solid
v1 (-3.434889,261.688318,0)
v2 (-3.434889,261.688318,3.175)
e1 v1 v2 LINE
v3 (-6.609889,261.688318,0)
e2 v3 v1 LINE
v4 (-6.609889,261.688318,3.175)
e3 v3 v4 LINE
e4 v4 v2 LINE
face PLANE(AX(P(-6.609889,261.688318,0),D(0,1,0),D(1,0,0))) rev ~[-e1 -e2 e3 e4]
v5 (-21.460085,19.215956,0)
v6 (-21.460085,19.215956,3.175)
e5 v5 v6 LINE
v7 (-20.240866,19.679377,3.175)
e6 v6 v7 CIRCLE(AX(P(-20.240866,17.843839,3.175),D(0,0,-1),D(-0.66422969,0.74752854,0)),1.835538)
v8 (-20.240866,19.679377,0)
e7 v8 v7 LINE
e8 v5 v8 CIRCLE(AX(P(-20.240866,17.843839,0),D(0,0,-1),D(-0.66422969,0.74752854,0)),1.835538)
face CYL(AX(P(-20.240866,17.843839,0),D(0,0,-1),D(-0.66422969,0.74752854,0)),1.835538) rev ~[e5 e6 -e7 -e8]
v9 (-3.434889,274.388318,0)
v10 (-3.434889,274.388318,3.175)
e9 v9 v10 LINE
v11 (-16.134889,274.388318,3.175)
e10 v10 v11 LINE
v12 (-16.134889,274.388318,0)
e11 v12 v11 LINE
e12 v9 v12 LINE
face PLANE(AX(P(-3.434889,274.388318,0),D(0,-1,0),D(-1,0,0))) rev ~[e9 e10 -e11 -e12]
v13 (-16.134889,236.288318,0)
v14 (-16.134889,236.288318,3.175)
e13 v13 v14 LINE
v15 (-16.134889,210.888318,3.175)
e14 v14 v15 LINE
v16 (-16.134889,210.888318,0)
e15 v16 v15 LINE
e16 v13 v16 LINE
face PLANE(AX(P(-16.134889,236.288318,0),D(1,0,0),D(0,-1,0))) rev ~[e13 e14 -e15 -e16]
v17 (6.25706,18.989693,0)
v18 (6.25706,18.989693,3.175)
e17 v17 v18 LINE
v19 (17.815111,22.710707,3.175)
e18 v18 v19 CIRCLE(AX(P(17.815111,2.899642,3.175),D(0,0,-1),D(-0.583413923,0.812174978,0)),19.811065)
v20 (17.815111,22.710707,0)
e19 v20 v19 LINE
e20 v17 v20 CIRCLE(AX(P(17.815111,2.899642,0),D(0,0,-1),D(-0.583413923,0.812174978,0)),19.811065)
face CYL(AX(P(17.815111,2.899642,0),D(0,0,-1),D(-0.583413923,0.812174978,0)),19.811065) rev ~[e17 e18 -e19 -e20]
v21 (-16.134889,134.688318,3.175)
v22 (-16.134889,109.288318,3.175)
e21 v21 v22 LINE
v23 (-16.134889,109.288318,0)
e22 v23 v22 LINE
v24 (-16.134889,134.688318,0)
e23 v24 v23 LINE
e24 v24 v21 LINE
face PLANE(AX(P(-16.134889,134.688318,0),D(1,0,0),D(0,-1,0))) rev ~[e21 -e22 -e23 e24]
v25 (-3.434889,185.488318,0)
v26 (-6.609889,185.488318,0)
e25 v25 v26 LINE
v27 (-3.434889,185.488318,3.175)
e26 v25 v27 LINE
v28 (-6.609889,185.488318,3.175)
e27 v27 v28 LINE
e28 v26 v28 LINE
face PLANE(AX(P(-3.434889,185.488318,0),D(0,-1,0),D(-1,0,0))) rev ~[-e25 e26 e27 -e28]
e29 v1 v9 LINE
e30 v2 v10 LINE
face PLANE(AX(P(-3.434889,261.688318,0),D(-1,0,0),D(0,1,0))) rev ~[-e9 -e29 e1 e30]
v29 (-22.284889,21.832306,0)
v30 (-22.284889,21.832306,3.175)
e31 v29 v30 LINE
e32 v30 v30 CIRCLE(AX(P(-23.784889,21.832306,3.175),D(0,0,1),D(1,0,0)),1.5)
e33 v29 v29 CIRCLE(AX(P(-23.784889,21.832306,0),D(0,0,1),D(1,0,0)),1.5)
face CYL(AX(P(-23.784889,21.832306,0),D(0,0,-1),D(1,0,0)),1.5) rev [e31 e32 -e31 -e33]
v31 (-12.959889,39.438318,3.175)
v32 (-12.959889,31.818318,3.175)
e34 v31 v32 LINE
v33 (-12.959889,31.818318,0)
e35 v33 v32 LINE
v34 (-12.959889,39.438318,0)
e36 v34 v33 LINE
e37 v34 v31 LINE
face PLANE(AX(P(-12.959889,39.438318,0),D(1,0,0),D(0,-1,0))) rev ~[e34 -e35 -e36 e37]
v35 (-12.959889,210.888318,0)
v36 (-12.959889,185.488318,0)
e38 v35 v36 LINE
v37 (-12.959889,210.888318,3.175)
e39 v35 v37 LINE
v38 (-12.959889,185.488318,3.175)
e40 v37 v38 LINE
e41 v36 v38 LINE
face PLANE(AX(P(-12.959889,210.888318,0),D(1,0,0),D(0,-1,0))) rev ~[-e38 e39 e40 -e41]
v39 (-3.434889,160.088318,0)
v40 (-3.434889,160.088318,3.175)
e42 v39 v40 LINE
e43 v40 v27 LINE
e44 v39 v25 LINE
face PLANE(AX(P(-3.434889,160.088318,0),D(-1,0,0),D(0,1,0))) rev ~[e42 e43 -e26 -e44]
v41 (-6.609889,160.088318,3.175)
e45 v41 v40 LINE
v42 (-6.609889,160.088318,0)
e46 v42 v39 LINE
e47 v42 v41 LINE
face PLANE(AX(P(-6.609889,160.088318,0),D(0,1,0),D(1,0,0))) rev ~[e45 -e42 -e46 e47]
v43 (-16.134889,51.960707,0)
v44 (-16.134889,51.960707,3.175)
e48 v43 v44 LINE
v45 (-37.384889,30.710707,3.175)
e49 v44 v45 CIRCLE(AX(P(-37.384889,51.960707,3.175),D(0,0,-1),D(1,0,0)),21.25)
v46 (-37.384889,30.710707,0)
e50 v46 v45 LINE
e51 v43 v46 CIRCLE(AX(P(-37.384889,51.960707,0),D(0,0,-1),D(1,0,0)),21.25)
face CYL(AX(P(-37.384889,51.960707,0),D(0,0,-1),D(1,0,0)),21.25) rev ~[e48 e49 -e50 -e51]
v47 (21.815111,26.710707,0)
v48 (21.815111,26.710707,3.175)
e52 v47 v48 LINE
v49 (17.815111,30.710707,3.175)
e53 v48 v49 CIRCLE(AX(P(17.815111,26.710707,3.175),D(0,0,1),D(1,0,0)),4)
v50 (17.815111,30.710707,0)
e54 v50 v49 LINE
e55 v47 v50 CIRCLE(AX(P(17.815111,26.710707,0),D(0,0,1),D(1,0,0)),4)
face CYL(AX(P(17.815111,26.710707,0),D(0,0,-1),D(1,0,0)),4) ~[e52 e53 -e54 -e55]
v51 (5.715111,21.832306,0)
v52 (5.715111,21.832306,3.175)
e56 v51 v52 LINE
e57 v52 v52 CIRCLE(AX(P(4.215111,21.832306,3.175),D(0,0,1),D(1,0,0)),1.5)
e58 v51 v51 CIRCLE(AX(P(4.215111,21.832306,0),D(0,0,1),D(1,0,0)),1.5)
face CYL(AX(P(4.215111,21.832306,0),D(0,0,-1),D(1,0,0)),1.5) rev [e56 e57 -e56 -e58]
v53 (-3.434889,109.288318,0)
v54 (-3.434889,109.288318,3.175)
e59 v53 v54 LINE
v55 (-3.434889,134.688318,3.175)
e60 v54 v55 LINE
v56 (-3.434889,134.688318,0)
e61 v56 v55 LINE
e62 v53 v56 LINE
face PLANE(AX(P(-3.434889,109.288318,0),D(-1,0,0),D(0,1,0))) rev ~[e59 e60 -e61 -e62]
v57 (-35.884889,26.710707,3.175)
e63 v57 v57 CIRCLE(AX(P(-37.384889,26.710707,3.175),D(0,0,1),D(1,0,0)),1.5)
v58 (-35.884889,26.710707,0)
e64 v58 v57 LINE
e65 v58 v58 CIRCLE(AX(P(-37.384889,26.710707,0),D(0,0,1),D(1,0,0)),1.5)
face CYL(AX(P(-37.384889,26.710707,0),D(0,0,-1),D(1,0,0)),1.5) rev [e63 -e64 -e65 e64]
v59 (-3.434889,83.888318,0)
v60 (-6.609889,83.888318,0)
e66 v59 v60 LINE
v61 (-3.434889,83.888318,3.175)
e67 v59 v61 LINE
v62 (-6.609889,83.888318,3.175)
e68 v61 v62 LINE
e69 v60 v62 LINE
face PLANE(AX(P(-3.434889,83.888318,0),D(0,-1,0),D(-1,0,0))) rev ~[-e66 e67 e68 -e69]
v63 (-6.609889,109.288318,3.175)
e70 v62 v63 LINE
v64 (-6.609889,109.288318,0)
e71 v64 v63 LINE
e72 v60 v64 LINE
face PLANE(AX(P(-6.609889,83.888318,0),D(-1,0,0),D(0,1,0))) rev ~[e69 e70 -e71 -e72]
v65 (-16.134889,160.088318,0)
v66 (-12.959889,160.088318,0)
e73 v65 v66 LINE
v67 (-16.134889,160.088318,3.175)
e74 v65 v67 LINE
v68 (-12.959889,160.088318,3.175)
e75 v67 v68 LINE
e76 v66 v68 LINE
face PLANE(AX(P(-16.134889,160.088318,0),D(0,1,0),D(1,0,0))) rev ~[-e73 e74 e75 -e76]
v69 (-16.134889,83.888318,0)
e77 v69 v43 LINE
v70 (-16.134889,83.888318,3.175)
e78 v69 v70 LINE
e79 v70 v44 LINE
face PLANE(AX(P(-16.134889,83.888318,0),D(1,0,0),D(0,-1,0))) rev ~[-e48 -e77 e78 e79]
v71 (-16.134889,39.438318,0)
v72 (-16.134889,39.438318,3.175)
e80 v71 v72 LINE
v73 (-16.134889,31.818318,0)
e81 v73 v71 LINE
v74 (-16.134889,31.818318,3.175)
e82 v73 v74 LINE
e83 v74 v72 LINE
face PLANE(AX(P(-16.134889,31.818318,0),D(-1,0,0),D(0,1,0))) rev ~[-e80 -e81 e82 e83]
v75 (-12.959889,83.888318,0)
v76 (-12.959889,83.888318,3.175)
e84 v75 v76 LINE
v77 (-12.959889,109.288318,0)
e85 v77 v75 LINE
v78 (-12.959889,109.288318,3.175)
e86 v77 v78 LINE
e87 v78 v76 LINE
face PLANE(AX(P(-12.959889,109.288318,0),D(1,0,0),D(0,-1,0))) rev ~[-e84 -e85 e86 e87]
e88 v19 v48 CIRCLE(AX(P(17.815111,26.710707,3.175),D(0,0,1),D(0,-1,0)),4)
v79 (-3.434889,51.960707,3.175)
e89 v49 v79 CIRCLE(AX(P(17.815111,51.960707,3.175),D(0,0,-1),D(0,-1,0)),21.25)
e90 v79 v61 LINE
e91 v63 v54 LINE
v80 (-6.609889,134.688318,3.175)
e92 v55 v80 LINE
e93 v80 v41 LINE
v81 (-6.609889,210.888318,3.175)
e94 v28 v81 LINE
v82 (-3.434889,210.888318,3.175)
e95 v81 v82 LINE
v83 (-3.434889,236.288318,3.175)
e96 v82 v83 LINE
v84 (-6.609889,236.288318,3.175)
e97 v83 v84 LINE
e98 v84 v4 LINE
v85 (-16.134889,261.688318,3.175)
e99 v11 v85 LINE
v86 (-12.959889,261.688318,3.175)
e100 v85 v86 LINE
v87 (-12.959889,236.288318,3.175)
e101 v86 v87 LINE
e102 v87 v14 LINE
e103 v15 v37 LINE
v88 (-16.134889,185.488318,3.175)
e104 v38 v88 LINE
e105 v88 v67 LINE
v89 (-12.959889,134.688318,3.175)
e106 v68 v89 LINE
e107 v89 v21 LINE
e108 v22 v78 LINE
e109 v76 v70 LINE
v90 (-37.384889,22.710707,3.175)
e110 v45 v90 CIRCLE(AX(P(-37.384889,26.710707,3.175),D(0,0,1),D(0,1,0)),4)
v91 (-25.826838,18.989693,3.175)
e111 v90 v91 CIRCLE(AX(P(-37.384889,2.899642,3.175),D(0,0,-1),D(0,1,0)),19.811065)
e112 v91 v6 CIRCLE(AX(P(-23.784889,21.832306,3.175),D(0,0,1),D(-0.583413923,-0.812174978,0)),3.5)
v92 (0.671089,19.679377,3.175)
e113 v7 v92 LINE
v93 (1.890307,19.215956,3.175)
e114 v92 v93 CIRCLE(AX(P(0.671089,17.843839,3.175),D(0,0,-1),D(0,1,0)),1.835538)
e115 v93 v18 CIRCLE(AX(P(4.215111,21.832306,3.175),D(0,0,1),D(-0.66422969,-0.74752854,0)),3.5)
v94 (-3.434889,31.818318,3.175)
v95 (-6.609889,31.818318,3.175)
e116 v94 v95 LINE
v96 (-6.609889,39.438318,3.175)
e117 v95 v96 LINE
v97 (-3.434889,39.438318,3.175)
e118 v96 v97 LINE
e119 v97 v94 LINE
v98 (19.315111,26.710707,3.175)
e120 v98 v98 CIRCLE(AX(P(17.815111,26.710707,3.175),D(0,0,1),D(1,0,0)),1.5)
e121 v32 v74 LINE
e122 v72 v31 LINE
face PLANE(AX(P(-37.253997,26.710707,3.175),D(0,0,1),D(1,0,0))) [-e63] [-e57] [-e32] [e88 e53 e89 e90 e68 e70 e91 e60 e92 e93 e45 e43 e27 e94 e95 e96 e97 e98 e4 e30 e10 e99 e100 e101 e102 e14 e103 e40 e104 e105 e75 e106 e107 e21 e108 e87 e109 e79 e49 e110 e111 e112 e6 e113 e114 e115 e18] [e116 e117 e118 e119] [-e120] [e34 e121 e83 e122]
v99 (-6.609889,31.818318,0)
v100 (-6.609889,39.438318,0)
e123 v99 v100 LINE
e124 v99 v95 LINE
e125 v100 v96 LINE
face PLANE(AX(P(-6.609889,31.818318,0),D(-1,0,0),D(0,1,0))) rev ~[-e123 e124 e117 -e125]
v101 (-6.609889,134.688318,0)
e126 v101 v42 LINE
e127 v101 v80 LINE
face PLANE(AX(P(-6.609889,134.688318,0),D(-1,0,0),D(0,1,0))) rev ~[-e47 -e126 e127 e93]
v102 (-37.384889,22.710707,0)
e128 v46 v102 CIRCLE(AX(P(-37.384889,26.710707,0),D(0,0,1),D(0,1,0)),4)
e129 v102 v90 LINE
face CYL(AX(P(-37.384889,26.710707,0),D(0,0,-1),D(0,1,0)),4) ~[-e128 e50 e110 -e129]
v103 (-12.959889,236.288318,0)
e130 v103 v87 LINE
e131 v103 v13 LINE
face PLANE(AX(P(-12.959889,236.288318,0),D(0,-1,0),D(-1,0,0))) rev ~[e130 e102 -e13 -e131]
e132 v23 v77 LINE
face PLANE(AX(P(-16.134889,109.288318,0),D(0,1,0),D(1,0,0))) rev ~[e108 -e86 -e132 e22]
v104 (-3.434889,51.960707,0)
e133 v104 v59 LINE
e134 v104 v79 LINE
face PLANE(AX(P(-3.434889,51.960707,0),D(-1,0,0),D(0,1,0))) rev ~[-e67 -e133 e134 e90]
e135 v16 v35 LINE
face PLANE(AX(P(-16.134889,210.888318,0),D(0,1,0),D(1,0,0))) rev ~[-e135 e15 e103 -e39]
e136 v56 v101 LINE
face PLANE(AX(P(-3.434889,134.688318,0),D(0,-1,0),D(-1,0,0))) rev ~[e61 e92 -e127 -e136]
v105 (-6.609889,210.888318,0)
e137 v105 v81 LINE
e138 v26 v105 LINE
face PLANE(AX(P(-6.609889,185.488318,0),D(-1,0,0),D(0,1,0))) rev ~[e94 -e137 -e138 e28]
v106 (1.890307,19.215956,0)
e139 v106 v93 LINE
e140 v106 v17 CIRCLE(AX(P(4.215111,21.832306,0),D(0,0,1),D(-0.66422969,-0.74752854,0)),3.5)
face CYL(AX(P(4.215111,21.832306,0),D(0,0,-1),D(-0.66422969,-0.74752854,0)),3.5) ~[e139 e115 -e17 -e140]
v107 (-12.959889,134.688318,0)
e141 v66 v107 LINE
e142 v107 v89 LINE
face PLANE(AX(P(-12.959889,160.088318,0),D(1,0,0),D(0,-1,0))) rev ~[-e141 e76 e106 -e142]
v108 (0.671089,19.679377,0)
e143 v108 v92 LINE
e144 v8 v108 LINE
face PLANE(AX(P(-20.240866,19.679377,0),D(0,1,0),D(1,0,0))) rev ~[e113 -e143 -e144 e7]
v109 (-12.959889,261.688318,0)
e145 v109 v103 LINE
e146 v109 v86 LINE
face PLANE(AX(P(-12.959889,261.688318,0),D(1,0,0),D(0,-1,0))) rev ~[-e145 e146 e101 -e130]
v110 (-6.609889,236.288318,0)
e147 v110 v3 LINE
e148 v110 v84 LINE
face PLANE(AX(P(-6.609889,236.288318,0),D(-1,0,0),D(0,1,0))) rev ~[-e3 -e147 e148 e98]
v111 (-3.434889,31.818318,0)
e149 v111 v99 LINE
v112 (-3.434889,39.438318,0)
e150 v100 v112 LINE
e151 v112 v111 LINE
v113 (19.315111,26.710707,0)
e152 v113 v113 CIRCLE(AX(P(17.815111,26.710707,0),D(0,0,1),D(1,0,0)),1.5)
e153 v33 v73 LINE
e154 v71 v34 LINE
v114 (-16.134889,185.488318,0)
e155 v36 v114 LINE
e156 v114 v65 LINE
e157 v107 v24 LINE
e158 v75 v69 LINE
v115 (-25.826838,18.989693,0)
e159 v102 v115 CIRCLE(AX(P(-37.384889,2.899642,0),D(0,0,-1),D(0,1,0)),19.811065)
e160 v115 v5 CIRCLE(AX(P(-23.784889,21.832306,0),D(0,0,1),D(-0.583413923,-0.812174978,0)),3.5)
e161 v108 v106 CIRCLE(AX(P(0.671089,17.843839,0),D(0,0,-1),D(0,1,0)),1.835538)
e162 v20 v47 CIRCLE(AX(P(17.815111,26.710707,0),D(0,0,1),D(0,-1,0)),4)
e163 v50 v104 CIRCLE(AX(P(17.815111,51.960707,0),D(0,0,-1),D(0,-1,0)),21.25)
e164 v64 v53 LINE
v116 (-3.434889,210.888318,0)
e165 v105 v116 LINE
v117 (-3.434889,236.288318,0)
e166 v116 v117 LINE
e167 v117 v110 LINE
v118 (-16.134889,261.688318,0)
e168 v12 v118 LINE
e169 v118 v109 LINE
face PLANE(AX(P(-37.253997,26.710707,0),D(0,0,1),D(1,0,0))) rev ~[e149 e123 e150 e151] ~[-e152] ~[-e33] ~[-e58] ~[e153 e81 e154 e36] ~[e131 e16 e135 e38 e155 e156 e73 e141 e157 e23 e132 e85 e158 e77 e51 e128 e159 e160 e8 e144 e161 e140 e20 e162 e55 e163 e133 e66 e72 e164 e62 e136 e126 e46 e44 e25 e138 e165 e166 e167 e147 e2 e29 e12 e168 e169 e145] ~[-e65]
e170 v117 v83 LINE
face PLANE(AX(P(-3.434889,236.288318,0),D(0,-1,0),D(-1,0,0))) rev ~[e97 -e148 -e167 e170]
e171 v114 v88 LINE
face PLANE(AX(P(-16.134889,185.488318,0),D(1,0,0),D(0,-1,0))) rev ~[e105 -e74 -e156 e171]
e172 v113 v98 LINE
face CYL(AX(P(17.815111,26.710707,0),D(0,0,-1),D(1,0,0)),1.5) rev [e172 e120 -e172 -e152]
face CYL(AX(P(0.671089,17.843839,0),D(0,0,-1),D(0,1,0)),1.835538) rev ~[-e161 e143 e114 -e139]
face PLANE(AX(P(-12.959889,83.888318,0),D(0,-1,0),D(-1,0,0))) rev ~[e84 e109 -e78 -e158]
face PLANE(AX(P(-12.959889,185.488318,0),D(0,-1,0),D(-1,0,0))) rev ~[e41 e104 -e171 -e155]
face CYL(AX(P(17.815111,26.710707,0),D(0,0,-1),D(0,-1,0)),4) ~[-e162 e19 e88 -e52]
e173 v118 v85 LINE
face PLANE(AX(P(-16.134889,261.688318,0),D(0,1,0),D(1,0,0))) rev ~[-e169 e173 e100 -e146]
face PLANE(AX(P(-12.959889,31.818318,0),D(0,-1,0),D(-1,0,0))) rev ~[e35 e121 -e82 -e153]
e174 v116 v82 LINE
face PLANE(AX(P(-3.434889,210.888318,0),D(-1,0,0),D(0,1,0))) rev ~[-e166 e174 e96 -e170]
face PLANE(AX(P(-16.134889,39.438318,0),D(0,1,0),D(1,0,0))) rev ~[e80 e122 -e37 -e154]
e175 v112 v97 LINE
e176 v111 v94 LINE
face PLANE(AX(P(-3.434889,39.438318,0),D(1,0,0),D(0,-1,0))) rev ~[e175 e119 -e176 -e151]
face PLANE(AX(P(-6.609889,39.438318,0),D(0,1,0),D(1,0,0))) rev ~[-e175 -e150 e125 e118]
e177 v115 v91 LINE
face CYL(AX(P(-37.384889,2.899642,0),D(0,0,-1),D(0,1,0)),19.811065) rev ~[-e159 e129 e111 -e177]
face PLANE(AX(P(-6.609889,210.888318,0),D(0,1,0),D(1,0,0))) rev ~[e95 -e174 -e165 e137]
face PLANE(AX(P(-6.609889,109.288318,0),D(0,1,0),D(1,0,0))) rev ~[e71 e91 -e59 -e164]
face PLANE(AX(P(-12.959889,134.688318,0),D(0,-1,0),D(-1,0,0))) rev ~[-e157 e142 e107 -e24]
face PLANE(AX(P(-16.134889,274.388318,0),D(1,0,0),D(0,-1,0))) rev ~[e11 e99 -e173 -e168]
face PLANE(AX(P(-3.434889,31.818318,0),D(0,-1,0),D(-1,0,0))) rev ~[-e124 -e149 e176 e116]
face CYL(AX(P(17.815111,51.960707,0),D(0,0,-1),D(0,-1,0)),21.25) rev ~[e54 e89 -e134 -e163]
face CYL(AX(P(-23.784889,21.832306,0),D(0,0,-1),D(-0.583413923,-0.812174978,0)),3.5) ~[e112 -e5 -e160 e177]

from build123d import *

# Parameters (mm, degrees)
F0_R     = 1.5
F1_DEPTH = 3.175


# Not quite as in the source:
# - a length typed as a fraction of an inch, garbled in the dataset ("3 / 203.2 mm" for 3/8 in), is restored
# - a feature names something its author has since deleted; it is built from what else it names


with BuildPart() as f1:
    # F0 (on Top) → F1 (new body)
    with BuildSketch(Plane.XY):
        with BuildLine():
            ThreePointArc((-33.3848889083, 26.7107070004), (-34.5564617835, 29.5391341252), (-37.3848889083, 30.7107070004))
            ThreePointArc((-37.3848889083, 30.7107070004), (-41.3848889083, 26.7107070004), (-37.3848889083, 22.7107070004))
            ThreePointArc((-37.3848889083, 22.7107070004), (-34.5564617835, 23.8822798757), (-33.3848889083, 26.7107070004))
        make_face()
        with Locations((-37.3848889083, 26.7107070004)):
            Circle(F0_R, mode=Mode.SUBTRACT)
        with BuildLine():
            Line((-3.4348889083, 20.3883182257), (-16.1348889083, 20.3883182257))
            Line((-16.1348889083, 20.3883182257), (-16.1348889083, 31.8183182257))
            Line((-16.1348889083, 31.8183182257), (-16.1348889083, 39.4383182257))
            Line((-16.1348889083, 39.4383182257), (-16.1348889083, 51.9607070004))
            ThreePointArc((-16.1348889083, 51.9607070004), (-22.3588698081, 36.9346879002), (-37.3848889083, 30.7107070004))
            ThreePointArc((-37.3848889083, 30.7107070004), (-34.5564617835, 29.5391341252), (-33.3848889083, 26.7107070004))
            ThreePointArc((-33.3848889083, 26.7107070004), (-34.5564617835, 23.8822798757), (-37.3848889083, 22.7107070004))
            ThreePointArc((-37.3848889083, 22.7107070004), (-31.3137586061, 21.7575229445), (-25.8268376377, 18.9896932393))
            ThreePointArc((-25.8268376377, 18.9896932393), (-25.3822585347, 24.9465327374), (-20.2848889083, 21.8323056621))
            ThreePointArc((-20.2848889083, 21.8323056621), (-20.5921773878, 20.3982229772), (-21.4600849924, 19.215955771))
            ThreePointArc((-21.4600849924, 19.215955771), (-20.8930268384, 19.5596143827), (-20.2408664312, 19.6793766243))
            Line((-20.2408664312, 19.6793766243), (0.6710886146, 19.6793766243))
            ThreePointArc((0.6710886146, 19.6793766243), (1.3232490219, 19.5596143827), (1.8903071759, 19.215955771))
            ThreePointArc((1.8903071759, 19.215955771), (2.7810284068, 25.0250171826), (7.7151110917, 21.8323056621))
            ThreePointArc((7.7151110917, 21.8323056621), (7.329338167, 20.2349360357), (6.2570598212, 18.9896932393))
            ThreePointArc((6.2570598212, 18.9896932393), (11.7439807896, 21.7575229445), (17.8151110917, 22.7107070004))
            ThreePointArc((17.8151110917, 22.7107070004), (13.8151110917, 26.7107070004), (17.8151110917, 30.7107070004))
            ThreePointArc((17.8151110917, 30.7107070004), (2.7890919915, 36.9346879002), (-3.4348889083, 51.9607070004))
            Line((-3.4348889083, 51.9607070004), (-3.4348889083, 39.4383182257))
            Line((-3.4348889083, 39.4383182257), (-3.4348889083, 31.8183182257))
            Line((-3.4348889083, 31.8183182257), (-3.4348889083, 20.3883182257))
        make_face()
        Polygon((-16.1348889083, 31.8183182257), (-16.1348889083, 20.3883182257), (-3.4348889083, 20.3883182257), (-3.4348889083, 31.8183182257), (-6.6098889083, 31.8183182257), (-6.6098889083, 39.4383182257), (-3.4348889083, 39.4383182257), (-3.4348889083, 51.9607070004), (-3.4348889083, 83.8883182257), (-6.6098889083, 83.8883182257), (-6.6098889083, 109.2883182257), (-3.4348889083, 109.2883182257), (-3.4348889083, 134.6883182257), (-6.6098889083, 134.6883182257), (-6.6098889083, 160.0883182257), (-3.4348889083, 160.0883182257), (-3.4348889083, 185.4883182257), (-6.6098889083, 185.4883182257), (-6.6098889083, 210.8883182257), (-3.4348889083, 210.8883182257), (-3.4348889083, 236.2883182257), (-6.6098889083, 236.2883182257), (-6.6098889083, 261.6883182257), (-3.4348889083, 261.6883182257), (-3.4348889083, 274.3883182257), (-16.1348889083, 274.3883182257), (-16.1348889083, 261.6883182257), (-12.9598889083, 261.6883182257), (-12.9598889083, 236.2883182257), (-16.1348889083, 236.2883182257), (-16.1348889083, 210.8883182257), (-12.9598889083, 210.8883182257), (-12.9598889083, 185.4883182257), (-16.1348889083, 185.4883182257), (-16.1348889083, 160.0883182257), (-12.9598889083, 160.0883182257), (-12.9598889083, 134.6883182257), (-16.1348889083, 134.6883182257), (-16.1348889083, 109.2883182257), (-12.9598889083, 109.2883182257), (-12.9598889083, 83.8883182257), (-16.1348889083, 83.8883182257), (-16.1348889083, 51.9607070004), (-16.1348889083, 39.4383182257), (-12.9598889083, 39.4383182257), (-12.9598889083, 31.8183182257), align=None)
        with BuildLine():
            ThreePointArc((21.8151110917, 26.7107070004), (20.6435382165, 29.5391341252), (17.8151110917, 30.7107070004))
            ThreePointArc((17.8151110917, 30.7107070004), (13.8151110917, 26.7107070004), (17.8151110917, 22.7107070004))
            ThreePointArc((17.8151110917, 22.7107070004), (20.6435382165, 23.8822798757), (21.8151110917, 26.7107070004))
        make_face()
        with Locations((17.8151110917, 26.7107070004)):
            Circle(F0_R, mode=Mode.SUBTRACT)
        with BuildLine():
            ThreePointArc((-20.2848889083, 21.8323056621), (-25.3822585347, 24.9465327374), (-25.8268376377, 18.9896932393))
            ThreePointArc((-25.8268376377, 18.9896932393), (-23.6037799702, 18.3369945812), (-21.4600849924, 19.215955771))
            ThreePointArc((-21.4600849924, 19.215955771), (-20.5921773878, 20.3982229772), (-20.2848889083, 21.8323056621))
        make_face()
        with Locations((-23.7848889083, 21.8323056621)):
            Circle(F0_R, mode=Mode.SUBTRACT)
        with BuildLine():
            ThreePointArc((1.8903071759, 19.215955771), (4.0340021537, 18.3369945812), (6.2570598212, 18.9896932393))
            ThreePointArc((6.2570598212, 18.9896932393), (7.329338167, 20.2349360357), (7.7151110917, 21.8323056621))
            ThreePointArc((7.7151110917, 21.8323056621), (2.7810284068, 25.0250171826), (1.8903071759, 19.215955771))
        make_face()
        with Locations((4.2151110917, 21.8323056621)):
            Circle(F0_R, mode=Mode.SUBTRACT)
    extrude(amount=F1_DEPTH)


solid = f1.part
